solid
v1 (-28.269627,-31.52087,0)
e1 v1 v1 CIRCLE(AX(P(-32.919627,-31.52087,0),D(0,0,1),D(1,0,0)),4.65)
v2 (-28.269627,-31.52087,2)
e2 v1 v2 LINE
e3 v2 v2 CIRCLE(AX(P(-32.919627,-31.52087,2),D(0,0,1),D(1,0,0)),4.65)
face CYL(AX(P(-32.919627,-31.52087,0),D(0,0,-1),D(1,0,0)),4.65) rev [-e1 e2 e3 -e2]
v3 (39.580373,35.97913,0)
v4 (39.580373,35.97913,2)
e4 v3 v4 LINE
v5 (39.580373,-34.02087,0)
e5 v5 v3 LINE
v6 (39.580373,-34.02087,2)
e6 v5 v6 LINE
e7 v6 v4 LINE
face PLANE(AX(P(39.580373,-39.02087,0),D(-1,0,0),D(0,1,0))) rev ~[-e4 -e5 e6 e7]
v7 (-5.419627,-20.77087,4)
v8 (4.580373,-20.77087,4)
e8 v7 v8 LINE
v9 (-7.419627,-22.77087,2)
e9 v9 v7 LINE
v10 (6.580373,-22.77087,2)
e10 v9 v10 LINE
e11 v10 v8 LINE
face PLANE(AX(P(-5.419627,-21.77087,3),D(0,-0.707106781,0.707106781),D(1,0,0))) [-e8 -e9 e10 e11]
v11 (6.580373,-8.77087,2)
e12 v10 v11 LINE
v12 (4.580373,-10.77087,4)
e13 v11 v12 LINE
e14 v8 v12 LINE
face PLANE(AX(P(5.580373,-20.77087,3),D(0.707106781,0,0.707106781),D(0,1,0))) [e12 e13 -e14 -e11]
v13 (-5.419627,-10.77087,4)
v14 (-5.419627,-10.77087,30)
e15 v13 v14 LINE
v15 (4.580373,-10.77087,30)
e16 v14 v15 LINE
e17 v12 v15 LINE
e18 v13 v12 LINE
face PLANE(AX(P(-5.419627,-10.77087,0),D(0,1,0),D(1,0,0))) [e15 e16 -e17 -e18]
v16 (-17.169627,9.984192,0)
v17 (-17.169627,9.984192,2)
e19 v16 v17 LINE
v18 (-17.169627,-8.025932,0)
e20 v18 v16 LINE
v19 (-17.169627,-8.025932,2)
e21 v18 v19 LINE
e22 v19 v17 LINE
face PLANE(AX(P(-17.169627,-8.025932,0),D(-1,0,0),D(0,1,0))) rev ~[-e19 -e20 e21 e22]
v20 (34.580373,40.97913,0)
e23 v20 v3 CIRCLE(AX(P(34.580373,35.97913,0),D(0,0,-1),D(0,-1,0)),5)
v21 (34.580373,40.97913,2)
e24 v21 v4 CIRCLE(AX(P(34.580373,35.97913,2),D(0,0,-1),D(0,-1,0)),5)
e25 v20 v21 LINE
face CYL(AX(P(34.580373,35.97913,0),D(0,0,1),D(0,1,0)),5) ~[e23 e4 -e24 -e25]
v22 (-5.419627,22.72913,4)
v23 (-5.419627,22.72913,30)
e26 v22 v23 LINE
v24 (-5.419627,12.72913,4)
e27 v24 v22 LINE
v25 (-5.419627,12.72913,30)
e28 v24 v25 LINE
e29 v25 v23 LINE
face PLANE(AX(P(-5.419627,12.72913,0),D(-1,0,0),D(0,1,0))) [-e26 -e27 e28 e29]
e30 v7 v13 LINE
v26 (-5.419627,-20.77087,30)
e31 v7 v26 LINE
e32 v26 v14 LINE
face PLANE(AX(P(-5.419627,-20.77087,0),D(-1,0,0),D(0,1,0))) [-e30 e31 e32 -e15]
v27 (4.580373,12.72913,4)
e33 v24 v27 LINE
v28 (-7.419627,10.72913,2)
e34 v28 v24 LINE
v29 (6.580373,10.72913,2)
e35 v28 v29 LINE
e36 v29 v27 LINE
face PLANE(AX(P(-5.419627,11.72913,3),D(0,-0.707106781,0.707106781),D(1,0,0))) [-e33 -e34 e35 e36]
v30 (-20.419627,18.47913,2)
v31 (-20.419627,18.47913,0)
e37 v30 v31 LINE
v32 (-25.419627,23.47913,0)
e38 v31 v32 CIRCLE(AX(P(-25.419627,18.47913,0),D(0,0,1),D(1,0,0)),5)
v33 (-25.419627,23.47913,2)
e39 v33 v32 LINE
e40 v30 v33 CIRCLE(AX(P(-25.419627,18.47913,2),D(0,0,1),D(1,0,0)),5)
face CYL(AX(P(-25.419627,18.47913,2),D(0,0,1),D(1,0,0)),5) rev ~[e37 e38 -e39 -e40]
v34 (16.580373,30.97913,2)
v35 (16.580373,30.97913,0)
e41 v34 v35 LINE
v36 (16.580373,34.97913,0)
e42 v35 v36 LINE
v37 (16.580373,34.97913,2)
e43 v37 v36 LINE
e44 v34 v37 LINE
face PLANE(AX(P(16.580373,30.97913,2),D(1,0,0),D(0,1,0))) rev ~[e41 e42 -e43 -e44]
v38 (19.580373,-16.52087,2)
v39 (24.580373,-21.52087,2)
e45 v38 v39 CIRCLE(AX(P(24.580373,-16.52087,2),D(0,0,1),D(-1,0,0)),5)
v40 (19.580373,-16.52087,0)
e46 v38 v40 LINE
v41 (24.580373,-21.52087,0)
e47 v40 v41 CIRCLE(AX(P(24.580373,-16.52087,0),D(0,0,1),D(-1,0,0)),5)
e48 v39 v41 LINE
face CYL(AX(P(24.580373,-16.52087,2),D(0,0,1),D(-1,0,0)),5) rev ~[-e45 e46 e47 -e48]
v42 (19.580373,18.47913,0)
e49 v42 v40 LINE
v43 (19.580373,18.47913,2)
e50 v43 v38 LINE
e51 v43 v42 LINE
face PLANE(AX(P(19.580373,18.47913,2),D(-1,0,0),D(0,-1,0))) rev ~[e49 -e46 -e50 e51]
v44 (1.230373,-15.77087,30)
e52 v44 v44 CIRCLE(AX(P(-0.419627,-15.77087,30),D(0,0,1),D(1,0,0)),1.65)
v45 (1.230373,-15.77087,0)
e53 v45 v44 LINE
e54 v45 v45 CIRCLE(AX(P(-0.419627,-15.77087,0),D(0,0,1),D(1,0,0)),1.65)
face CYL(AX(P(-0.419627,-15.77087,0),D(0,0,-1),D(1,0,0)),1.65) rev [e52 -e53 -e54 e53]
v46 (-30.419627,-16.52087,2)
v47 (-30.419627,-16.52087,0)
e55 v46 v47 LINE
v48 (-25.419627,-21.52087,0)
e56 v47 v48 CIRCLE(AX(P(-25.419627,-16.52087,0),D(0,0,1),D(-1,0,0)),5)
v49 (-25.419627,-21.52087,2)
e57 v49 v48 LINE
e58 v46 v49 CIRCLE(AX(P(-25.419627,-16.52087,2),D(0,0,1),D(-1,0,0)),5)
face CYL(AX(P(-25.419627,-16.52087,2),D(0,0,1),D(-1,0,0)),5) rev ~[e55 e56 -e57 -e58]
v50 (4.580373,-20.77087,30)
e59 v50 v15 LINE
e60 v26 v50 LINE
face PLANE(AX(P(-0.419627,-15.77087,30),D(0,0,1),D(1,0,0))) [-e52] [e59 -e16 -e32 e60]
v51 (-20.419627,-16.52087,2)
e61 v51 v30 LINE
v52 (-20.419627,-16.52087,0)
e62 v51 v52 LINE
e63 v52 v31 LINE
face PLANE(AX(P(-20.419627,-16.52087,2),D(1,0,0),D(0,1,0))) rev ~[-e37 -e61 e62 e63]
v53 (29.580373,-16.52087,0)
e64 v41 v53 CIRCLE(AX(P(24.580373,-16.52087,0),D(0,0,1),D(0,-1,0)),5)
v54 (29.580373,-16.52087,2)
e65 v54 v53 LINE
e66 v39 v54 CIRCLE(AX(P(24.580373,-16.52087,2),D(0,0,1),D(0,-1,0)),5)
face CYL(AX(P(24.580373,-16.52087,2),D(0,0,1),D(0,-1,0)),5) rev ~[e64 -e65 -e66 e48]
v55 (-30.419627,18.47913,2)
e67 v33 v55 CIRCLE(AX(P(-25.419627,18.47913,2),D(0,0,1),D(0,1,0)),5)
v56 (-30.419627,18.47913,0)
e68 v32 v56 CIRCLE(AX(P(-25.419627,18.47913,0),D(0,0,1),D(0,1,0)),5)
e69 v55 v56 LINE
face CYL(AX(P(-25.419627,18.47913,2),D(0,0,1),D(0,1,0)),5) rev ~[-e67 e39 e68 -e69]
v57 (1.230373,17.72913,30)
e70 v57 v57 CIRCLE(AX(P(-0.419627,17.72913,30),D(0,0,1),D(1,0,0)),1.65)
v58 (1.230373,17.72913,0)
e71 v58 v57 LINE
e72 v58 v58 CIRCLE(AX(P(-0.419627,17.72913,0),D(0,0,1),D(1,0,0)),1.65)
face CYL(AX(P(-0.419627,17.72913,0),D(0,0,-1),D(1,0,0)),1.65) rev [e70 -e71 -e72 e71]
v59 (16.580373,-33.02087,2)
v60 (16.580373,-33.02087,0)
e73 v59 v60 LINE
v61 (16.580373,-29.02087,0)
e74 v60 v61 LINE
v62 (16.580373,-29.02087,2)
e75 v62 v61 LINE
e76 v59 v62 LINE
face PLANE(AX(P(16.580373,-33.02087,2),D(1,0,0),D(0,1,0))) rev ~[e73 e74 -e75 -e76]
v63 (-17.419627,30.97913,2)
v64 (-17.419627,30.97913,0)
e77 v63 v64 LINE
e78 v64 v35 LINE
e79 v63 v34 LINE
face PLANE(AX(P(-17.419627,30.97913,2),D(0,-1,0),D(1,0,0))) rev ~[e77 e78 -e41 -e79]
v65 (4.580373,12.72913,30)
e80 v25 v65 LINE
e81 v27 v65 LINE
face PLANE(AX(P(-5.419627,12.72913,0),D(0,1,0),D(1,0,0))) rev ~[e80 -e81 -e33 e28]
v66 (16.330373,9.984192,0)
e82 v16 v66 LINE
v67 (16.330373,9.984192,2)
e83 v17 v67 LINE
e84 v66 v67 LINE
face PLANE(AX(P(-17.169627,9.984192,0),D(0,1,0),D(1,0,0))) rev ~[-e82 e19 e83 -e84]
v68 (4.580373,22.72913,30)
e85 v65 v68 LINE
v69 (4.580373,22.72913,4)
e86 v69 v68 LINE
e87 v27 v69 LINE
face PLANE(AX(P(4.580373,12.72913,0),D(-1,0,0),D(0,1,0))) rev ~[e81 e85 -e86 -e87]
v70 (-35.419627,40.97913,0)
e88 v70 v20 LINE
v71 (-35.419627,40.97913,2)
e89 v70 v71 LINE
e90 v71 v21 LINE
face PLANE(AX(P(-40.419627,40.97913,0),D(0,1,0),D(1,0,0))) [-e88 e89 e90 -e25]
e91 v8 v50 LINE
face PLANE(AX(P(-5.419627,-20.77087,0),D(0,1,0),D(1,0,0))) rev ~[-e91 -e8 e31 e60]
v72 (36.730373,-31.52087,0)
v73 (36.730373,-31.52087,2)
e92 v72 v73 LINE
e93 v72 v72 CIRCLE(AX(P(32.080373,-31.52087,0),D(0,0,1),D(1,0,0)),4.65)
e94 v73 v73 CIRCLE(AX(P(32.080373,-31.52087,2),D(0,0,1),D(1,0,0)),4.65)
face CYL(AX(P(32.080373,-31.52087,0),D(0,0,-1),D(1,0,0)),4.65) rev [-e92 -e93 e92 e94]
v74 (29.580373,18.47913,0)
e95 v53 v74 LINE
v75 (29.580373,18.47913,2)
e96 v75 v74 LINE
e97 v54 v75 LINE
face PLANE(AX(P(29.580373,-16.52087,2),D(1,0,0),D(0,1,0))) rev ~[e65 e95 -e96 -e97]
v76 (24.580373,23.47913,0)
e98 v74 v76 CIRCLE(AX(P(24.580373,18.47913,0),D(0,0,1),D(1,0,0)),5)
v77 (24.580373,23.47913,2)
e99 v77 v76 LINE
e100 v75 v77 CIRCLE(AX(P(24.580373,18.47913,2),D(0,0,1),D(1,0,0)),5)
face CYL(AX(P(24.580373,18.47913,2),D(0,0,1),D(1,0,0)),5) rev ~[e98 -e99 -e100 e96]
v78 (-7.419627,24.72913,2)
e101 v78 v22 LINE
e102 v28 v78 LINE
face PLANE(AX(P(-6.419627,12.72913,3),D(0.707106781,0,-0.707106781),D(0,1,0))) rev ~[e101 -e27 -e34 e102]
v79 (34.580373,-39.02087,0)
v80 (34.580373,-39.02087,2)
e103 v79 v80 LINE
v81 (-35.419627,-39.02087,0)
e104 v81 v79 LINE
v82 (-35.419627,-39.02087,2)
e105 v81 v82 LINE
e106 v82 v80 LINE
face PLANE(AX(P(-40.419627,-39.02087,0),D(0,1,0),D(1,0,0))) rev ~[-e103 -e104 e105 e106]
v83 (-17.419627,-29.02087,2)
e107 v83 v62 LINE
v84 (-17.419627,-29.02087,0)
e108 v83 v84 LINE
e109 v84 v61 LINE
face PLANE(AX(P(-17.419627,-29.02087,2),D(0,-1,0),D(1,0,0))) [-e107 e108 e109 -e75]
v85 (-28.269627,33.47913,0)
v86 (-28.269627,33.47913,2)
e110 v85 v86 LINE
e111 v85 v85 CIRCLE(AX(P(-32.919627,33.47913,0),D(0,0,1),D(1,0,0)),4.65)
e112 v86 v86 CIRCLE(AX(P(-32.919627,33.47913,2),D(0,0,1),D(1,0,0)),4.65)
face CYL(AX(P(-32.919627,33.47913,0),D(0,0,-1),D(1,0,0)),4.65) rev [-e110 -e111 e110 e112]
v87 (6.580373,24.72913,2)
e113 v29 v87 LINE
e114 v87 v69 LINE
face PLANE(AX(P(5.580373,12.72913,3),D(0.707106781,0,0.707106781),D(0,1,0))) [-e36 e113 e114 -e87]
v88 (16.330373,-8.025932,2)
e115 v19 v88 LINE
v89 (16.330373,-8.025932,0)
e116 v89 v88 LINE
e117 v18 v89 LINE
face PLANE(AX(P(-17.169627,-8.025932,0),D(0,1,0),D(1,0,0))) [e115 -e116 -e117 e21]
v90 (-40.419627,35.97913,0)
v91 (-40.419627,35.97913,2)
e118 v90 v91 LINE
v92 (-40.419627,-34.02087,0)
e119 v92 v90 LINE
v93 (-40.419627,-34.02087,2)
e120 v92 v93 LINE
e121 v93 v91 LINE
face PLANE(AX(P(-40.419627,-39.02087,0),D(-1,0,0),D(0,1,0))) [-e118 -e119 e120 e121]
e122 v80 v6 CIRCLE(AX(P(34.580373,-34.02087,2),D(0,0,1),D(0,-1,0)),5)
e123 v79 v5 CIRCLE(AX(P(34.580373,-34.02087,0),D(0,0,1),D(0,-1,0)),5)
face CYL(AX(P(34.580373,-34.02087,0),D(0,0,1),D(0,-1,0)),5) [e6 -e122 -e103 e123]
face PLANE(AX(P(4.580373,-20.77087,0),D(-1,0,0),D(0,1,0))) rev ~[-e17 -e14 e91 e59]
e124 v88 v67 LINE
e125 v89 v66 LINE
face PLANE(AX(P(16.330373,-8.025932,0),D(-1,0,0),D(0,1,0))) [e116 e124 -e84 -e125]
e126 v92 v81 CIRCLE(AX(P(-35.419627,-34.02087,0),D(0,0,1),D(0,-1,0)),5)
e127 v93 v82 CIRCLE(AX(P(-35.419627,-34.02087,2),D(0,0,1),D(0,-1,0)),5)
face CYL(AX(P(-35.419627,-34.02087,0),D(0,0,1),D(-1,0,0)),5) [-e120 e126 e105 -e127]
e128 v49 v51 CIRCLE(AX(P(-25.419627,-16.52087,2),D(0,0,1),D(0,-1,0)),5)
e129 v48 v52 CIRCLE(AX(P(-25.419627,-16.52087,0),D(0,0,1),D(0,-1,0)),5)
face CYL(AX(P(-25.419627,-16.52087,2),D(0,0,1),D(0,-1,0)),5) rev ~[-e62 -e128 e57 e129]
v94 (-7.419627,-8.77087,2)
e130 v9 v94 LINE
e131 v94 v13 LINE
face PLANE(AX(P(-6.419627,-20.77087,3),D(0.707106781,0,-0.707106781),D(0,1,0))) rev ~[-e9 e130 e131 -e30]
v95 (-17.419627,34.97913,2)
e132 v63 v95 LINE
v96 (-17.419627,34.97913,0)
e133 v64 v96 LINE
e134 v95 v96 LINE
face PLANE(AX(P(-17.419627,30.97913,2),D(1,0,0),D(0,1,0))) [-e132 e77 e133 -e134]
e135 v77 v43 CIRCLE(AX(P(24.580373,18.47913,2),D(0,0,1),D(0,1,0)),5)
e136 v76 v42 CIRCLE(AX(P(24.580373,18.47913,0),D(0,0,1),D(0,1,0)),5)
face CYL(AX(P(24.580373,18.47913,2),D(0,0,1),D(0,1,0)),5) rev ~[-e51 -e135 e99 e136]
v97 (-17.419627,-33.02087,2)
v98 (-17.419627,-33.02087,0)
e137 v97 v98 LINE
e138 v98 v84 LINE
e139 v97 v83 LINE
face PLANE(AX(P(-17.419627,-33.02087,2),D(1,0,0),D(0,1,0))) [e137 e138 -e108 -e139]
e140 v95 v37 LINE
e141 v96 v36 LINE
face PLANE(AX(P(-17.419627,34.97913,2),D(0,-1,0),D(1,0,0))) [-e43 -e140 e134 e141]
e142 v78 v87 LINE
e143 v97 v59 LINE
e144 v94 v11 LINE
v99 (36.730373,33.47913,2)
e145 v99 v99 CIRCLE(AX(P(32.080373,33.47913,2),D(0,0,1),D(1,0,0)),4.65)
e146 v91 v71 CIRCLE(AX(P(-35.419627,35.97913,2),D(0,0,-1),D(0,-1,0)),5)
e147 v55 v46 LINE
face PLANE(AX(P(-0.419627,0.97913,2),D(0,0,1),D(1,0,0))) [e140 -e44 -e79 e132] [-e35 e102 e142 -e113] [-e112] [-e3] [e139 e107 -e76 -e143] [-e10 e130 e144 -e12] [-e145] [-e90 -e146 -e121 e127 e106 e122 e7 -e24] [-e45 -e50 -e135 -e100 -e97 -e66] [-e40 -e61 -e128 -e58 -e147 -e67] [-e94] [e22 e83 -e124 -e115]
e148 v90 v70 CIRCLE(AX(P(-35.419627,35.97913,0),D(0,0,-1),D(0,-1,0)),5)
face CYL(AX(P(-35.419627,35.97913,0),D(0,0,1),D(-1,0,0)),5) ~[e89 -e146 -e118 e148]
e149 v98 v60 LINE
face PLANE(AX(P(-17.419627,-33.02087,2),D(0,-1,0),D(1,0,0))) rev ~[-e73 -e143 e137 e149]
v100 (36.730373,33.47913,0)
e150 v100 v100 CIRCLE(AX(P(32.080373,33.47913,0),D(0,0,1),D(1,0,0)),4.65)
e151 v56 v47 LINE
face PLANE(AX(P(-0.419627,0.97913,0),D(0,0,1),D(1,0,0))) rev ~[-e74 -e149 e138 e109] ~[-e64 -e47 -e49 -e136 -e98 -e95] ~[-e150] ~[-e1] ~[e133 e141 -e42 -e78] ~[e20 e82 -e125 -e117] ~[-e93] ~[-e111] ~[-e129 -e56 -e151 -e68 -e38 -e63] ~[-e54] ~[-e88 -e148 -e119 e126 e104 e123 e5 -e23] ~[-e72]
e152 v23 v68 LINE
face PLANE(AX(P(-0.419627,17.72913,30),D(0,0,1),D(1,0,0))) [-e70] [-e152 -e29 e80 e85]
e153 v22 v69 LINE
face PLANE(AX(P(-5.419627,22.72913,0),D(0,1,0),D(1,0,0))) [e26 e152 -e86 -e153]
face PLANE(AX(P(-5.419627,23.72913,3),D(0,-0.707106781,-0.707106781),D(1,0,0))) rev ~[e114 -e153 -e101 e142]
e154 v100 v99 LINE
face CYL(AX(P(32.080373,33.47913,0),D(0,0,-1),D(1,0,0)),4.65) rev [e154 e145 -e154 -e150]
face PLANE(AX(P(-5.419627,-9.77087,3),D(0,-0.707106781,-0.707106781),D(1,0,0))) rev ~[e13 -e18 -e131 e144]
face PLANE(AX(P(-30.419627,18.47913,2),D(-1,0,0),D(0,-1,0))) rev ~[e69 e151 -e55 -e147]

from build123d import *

# Parameters (mm, degrees)
F0_W     = 10
F0_H     = 10
F0_R     = 1.65
F1_DEPTH = 30
F0_W_2   = 80
F0_H_2   = 80
F0_R_2   = 4.65
F0_W_3   = 33.5
F0_H_3   = 18.0101236328
F2_DEPTH = 2
F3_R     = 5
F4_SIZE  = 2
F5_W     = 34
F5_H     = 4
F6_DEPTH = 25


with BuildPart() as f1:
    # F0 (on Top) → F1 (new body)
    with BuildSketch(Plane.XY):
        with Locations((-0.4196270893, 17.7291296907)):
            Rectangle(F0_W, F0_H)
        with Locations((-0.4196270893, 17.7291296907)):
            Circle(F0_R, mode=Mode.SUBTRACT)
    extrude(amount=F1_DEPTH)



with BuildPart() as f1b:
    # F0 (on Top) → F1, piece 2 (new body)
    with BuildSketch(Plane.XY):
        with Locations((-0.4196270893, -15.7708703093)):
            Rectangle(F0_W, F0_H)
        with Locations((-0.4196270893, -15.7708703093)):
            Circle(F0_R, mode=Mode.SUBTRACT)
    extrude(amount=F1_DEPTH)


with BuildPart() as f1_1:
    add(f1.part)

    add(f1b.part)  # F2 merges F1b
    # F0 (on Top) → F2 (join)
    with BuildSketch(Plane.XY):
        with Locations((-0.4196270893, 0.9791296907)):
            Rectangle(F0_W_2, F0_H_2)
        with Locations((-32.9196270893, -31.5208703093)):
            Circle(F0_R_2, mode=Mode.SUBTRACT)
        with Locations((32.0803729107, -31.5208703093)):
            Circle(F0_R_2, mode=Mode.SUBTRACT)
        with Locations((-0.4196270893, -15.7708703093)):
            Rectangle(F0_W, F0_H, mode=Mode.SUBTRACT)
        with Locations((-32.9196270893, 33.4791296907)):
            Circle(F0_R_2, mode=Mode.SUBTRACT)
        with Locations((-0.4196270893, 0.9791296907)):
            Rectangle(F0_W_3, F0_H_3, mode=Mode.SUBTRACT)
        with Locations((-0.4196270893, 17.7291296907)):
            Rectangle(F0_W, F0_H, mode=Mode.SUBTRACT)
        with Locations((32.0803729107, 33.4791296907)):
            Circle(F0_R_2, mode=Mode.SUBTRACT)
    extrude(amount=F2_DEPTH)

    # F3
    f3_edges = [f1_1.edges().sort_by_distance(p)[0] for p in [
        (-40.419627, -39.02087, 1),
        (-40.419627, 40.97913, 1),
        (39.580373, -39.02087, 1),
        (39.580373, 40.97913, 1),
    ]]
    fillet(f3_edges, radius=F3_R)

    # F4
    f4_edges = [f1_1.edges().sort_by_distance(p)[0] for p in [
        (-0.419627, 22.72913, 2),
        (-0.419627, -10.77087, 2),
        (4.580373, -15.77087, 2),
        (4.580373, 17.72913, 2),
        (-0.419627, -20.77087, 2),
        (-0.419627, 12.72913, 2),
        (-5.419627, 17.72913, 2),
        (-5.419627, -15.77087, 2),
    ]]
    chamfer(f4_edges, length=F4_SIZE)

    # F5 (on face) → F6 (cut)
    with BuildSketch(Plane.XY.offset(2)):
        with BuildLine():
            Line((-20.4196270893, -16.5208703093), (-20.4196270893, 18.4791296907))
            ThreePointArc((-20.4196270893, 18.4791296907), (-21.8840931834, 22.0146635966), (-25.4196270893, 23.4791296907))
            ThreePointArc((-25.4196270893, 23.4791296907), (-28.9551609952, 22.0146635966), (-30.4196270893, 18.4791296907))
            Line((-30.4196270893, 18.4791296907), (-30.4196270893, -16.5208703093))
            ThreePointArc((-30.4196270893, -16.5208703093), (-28.9551609952, -20.0564042153), (-25.4196270893, -21.5208703093))
            ThreePointArc((-25.4196270893, -21.5208703093), (-21.8840931834, -20.0564042153), (-20.4196270893, -16.5208703093))
        make_face()
        with Locations((-0.4196270893, 32.9791296907)):
            Rectangle(F5_W, F5_H)
        with BuildLine():
            ThreePointArc((24.5803729107, 23.4791296907), (21.0448390048, 22.0146635966), (19.5803729107, 18.4791296907))
            Line((19.5803729107, 18.4791296907), (19.5803729107, -16.5208703093))
            ThreePointArc((19.5803729107, -16.5208703093), (21.0448390048, -20.0564042153), (24.5803729107, -21.5208703093))
            ThreePointArc((24.5803729107, -21.5208703093), (28.1159068166, -20.0564042153), (29.5803729107, -16.5208703093))
            Line((29.5803729107, -16.5208703093), (29.5803729107, 18.4791296907))
            ThreePointArc((29.5803729107, 18.4791296907), (28.1159068166, 22.0146635966), (24.5803729107, 23.4791296907))
        make_face()
        with Locations((-0.4196270893, -31.0208703093)):
            Rectangle(F5_W, F5_H)
    extrude(amount=-F6_DEPTH, mode=Mode.SUBTRACT)


solid = f1_1.part
